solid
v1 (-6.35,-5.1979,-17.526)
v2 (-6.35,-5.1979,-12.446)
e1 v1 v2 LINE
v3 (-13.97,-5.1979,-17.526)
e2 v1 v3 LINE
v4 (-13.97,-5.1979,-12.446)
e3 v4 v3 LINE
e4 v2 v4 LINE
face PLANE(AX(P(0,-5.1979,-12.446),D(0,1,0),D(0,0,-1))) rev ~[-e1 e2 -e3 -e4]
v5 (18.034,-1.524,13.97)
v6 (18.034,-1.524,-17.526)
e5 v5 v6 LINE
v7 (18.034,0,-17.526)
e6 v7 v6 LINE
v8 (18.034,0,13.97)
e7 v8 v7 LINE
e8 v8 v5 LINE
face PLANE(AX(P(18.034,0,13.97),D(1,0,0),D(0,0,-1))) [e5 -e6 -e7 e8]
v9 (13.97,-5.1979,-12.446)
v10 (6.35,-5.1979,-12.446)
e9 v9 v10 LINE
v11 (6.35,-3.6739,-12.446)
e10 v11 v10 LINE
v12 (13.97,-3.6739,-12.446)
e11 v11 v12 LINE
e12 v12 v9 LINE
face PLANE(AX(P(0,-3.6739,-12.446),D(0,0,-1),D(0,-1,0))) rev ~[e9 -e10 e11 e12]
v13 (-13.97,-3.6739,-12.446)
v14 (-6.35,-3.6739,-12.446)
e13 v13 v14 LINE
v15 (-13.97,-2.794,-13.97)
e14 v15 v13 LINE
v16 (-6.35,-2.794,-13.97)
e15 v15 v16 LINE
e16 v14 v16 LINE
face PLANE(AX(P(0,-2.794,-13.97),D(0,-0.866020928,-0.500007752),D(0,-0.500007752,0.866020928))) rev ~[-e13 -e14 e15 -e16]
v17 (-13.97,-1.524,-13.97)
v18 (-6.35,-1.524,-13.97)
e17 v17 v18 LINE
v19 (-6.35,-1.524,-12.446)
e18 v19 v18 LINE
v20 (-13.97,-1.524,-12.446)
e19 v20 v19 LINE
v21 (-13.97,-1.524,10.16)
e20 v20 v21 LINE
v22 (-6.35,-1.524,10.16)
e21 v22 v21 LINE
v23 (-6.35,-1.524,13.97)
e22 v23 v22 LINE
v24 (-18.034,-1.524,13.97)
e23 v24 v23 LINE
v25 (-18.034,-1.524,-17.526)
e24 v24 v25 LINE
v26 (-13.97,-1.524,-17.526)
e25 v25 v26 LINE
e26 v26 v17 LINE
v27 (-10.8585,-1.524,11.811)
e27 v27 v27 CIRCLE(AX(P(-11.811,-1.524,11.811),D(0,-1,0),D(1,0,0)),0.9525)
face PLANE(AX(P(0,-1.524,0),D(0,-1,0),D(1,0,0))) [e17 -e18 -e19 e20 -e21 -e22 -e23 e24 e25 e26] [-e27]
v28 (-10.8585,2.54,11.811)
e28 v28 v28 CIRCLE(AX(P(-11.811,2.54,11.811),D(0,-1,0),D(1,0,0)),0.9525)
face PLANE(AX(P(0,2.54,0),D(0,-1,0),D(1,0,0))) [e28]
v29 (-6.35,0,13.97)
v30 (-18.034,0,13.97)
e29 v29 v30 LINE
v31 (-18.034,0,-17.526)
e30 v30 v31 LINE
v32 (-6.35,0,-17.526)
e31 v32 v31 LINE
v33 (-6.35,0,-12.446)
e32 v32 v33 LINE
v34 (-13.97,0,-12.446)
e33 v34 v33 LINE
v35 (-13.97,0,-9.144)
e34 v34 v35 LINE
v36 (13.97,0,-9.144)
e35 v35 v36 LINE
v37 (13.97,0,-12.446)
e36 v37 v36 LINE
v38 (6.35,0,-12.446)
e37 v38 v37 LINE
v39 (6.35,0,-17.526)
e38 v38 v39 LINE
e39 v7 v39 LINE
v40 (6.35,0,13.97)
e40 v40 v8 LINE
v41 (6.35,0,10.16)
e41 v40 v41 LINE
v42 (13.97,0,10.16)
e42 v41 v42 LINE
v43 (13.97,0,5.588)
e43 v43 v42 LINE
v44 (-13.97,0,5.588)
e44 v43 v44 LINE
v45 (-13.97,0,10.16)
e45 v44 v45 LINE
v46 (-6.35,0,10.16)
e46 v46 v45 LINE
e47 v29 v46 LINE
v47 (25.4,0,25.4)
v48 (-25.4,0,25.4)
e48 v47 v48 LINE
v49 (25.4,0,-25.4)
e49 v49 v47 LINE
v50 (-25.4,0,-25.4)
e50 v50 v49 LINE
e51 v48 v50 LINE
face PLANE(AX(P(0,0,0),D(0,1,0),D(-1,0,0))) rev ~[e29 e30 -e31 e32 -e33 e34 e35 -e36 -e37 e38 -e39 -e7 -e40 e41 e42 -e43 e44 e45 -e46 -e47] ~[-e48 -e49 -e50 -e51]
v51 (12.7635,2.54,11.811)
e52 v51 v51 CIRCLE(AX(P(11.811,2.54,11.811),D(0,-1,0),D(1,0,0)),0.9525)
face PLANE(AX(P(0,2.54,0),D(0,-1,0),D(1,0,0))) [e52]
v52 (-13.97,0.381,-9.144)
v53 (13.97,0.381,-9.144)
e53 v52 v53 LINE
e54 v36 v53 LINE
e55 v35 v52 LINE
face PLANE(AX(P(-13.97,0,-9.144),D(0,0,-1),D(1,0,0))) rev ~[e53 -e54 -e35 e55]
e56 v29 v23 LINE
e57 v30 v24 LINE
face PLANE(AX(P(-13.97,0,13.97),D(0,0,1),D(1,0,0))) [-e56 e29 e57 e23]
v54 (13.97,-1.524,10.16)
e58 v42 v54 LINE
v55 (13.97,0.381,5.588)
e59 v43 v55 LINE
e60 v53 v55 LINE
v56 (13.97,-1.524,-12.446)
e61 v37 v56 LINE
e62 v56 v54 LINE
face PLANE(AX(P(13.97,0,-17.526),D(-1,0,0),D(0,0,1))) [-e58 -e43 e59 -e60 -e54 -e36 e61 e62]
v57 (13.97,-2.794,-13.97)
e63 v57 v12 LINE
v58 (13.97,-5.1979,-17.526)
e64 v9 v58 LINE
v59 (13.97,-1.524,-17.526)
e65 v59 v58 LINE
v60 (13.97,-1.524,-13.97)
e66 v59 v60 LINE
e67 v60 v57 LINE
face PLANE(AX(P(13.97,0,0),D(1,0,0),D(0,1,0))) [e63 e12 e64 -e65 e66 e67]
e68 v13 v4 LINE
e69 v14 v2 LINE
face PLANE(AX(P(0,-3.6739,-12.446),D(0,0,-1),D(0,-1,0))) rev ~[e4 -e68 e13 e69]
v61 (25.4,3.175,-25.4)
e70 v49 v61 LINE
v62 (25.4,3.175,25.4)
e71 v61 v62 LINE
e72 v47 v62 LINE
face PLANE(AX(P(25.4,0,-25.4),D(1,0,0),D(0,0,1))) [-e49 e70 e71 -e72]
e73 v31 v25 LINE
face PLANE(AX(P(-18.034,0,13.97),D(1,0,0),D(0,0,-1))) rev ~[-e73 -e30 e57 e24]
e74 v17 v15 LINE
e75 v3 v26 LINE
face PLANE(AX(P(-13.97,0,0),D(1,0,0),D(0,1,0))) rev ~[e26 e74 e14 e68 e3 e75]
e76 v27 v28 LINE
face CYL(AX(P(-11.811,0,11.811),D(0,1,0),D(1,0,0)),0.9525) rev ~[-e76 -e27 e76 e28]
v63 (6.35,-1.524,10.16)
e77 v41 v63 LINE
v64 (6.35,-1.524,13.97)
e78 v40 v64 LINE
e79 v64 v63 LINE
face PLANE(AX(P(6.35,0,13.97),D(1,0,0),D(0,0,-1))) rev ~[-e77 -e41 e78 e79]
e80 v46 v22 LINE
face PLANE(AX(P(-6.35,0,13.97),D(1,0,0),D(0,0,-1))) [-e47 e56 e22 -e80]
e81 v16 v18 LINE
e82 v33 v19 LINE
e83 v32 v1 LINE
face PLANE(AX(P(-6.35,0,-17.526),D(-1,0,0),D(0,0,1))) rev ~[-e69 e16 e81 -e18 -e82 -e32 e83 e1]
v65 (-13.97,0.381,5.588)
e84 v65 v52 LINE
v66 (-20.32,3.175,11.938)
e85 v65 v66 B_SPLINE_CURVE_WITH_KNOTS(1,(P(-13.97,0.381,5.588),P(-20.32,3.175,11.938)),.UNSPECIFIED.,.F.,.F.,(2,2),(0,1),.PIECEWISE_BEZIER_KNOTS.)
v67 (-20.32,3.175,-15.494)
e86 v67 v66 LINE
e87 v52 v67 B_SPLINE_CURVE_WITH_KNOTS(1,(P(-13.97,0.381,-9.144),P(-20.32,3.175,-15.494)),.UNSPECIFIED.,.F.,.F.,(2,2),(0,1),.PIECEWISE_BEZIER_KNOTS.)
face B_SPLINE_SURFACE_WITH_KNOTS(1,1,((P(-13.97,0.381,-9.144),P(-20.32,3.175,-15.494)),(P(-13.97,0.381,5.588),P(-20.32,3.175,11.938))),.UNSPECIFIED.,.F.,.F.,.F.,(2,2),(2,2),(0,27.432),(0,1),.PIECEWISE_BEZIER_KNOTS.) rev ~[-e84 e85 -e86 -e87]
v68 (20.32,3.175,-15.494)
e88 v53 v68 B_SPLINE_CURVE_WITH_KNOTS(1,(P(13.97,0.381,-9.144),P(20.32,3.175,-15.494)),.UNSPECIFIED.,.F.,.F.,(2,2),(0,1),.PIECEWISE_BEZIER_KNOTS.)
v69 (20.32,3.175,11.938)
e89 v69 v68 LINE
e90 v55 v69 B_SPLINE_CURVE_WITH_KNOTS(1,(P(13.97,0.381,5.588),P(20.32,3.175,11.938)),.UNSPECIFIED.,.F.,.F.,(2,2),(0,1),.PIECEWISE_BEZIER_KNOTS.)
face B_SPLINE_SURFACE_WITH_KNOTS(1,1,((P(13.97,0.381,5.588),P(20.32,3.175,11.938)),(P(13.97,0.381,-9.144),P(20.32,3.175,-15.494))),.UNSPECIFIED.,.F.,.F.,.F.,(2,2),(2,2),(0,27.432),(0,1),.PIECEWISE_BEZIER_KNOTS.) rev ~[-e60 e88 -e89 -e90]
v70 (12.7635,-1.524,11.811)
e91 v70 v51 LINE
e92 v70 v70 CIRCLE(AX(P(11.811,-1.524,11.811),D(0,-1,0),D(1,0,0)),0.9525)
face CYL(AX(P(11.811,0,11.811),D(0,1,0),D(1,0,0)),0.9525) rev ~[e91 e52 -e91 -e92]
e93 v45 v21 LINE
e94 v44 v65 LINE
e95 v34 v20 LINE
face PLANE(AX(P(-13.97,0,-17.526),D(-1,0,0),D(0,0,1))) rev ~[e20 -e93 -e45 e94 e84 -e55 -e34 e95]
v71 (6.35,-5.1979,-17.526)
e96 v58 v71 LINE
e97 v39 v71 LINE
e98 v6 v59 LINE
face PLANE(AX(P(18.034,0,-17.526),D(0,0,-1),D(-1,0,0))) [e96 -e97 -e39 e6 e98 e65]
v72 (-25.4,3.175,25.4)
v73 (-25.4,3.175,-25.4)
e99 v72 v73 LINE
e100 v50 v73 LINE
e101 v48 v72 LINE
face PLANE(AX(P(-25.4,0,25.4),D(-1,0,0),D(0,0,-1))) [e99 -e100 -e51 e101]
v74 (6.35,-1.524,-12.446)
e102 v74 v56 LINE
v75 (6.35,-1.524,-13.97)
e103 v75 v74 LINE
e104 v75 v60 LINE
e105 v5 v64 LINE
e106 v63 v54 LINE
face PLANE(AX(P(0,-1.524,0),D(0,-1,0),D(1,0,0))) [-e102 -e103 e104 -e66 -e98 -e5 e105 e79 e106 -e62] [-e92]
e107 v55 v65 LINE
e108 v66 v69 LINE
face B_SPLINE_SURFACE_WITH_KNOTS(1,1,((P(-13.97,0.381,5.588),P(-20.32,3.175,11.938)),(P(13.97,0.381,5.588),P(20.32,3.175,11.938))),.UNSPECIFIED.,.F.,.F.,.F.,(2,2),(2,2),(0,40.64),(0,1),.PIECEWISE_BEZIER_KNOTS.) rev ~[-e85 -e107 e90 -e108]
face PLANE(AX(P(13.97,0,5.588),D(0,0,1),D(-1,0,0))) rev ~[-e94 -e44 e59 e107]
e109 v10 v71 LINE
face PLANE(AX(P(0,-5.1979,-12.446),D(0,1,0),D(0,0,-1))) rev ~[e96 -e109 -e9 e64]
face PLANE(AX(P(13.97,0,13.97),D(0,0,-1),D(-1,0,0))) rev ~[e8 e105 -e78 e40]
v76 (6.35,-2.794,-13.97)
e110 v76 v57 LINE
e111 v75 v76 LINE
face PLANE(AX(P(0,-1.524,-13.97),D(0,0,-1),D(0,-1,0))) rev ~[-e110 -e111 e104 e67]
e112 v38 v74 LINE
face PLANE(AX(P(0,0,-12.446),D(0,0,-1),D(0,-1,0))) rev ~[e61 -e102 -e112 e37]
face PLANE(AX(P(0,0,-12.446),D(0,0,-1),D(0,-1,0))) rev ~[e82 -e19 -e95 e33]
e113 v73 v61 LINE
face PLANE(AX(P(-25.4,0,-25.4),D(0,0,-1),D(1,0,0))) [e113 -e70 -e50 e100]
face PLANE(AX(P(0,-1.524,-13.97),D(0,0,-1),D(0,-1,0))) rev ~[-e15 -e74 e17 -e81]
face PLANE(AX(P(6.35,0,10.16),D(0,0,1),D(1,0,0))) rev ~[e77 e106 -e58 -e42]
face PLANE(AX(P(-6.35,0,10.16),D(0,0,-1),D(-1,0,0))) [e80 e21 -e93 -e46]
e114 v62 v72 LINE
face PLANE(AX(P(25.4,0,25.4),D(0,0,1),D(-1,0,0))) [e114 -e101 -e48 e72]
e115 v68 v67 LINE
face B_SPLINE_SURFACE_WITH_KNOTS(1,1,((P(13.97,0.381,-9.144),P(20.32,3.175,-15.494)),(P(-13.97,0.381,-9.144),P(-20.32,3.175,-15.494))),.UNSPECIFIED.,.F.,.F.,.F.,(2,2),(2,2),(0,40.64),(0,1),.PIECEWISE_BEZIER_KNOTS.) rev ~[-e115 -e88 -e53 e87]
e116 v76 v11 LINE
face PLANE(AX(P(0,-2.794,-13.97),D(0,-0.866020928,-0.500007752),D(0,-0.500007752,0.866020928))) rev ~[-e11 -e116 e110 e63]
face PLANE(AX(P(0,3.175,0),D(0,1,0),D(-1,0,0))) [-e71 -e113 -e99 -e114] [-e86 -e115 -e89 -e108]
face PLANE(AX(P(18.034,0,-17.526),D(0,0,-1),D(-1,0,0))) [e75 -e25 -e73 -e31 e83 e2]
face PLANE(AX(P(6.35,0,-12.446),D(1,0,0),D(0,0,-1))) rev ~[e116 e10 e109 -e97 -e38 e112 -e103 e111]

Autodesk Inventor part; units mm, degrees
ref_plane "YZ Plane" through (0, 0, 0) normal (1, 0, 0) x (0, 1, 0)
ref_plane "XZ Plane" through (0, 0, 0) normal (0, 1, 0) x (-1, 0, 0)
ref_plane "XY Plane" through (0, 0, 0) normal (0, 0, 1) x (1, 0, 0)
sketch "Sketch1" plane through (0, 0, 0) normal (0, 1, 0) x (-1, 0, 0)
  line L0 (-25.4, 25.4) -> (25.4, 25.4)
  line L1 (25.4, 25.4) -> (25.4, -25.4)
  line L2 (25.4, -25.4) -> (-25.4, -25.4)
  line L3 (-25.4, -25.4) -> (-25.4, 25.4)
  line L4 (-25.4, 25.4) -> (25.4, -25.4) construction
  line L5 (25.4, 25.4) -> (-25.4, -25.4) construction
  point P0 (0, 0)
  dimension "d0" = 50.8
  dimension "d1" = 50.8
extrude "Extrusion1" add sketch "Sketch1" along normal blind 3.175
sketch "Sketch2" plane through (0, 0, 0) normal (0, -1, 0) x (1, 0, 0)
  line L0 (-11.811, 11.811) -> (11.811, 11.811) construction
  line L1 (11.811, 11.811) -> (11.811, -11.811) construction
  line L2 (11.811, -11.811) -> (-11.811, -11.811) construction
  line L3 (-11.811, -11.811) -> (-11.811, 11.811) construction
  circle A0 centre (-11.811, 11.811) radius 0.9525
  line L4 (13.97, 13.97) -> (-13.97, 13.97) construction
  line L5 (-13.97, 13.97) -> (-13.97, -13.97) construction
  line L6 (-13.97, -13.97) -> (13.97, -13.97) construction
  line L7 (13.97, -13.97) -> (13.97, 13.97) construction
  line L8 (13.97, 13.97) -> (6.35, 13.97)
  line L9 (6.35, 13.97) -> (6.35, 10.16)
  line L10 (6.35, 10.16) -> (13.97, 10.16)
  line L11 (13.97, 10.16) -> (13.97, 13.97)
  line L12 (-13.97, 13.97) -> (-6.35, 13.97)
  line L13 (-6.35, 13.97) -> (-6.35, 10.16)
  line L14 (-6.35, 10.16) -> (-13.97, 10.16)
  line L15 (-13.97, 10.16) -> (-13.97, 13.97)
  circle A1 centre (11.811, 11.811) radius 0.9525
  line L16 (13.97, 13.97) -> (18.034, 13.97)
  line L17 (18.034, 13.97) -> (18.034, -17.526)
  line L18 (18.034, -17.526) -> (13.97, -17.526)
  line L19 (13.97, -17.526) -> (13.97, 13.97)
  line L20 (-13.97, 13.97) -> (-18.034, 13.97)
  line L21 (-18.034, 13.97) -> (-18.034, -17.526)
  line L22 (-18.034, -17.526) -> (-13.97, -17.526)
  line L23 (-13.97, -17.526) -> (-13.97, 13.97)
  point P0 (0, 0)
  point P1 (11.811, 0)
  point P2 (0, 11.811)
  point P3 (0, -13.97)
  point P4 (-13.97, 0)
  point P5 (-13.97, 10.16)
  point P6 (13.97, 10.16)
  dimension "d4" = 23.622
  dimension "d5" = 23.622
  dimension "d27" = 27.94
  dimension "d28" = 27.94
  dimension "d29" = 7.62
  dimension "d30" = 3.81
  dimension "d31" = 1.905
  dimension "d32" = 4.064
  dimension "d33" = 4.064
  dimension "d46" = 31.496
extrude "Extrusion2" add sketch "Sketch2" along normal blind 1.524
sketch "Sketch3" plane through (0, 0, 0) normal (0, -1, 0) x (1, 0, 0)
  line L0 (13.97, 13.97) -> (-13.97, 13.97) construction
  line L1 (-13.97, 13.97) -> (-13.97, -13.97) construction
  line L2 (-13.97, -13.97) -> (13.97, -13.97) construction
  line L3 (13.97, -13.97) -> (13.97, 13.97) construction
  line L4 (13.97, 13.97) -> (-13.97, -13.97) construction
  line L5 (-13.97, 13.97) -> (13.97, -13.97) construction
  line L6 (13.97, 5.588) -> (-13.97, 5.588)
  line L7 (-13.97, 5.588) -> (-13.97, -9.144)
  line L8 (-13.97, -9.144) -> (13.97, -9.144)
  line L9 (13.97, -9.144) -> (13.97, 5.588)
  point P0 (0, 0)
  dimension "d18" = 27.94
  dimension "d19" = 27.94
  dimension "d20" = 4.826
  dimension "d21" = 14.732
sketch "Sketch4" plane through (0, 3.175, 0) normal (0, 1, 0) x (1, 0, 0)
  line L0 (-13.97, 9.144) -> (13.97, 9.144) projected
  line L1 (13.97, -5.588) -> (-13.97, -5.588) projected
  line L2 (-13.97, -5.588) -> (-13.97, 9.144) projected
  line L3 (13.97, 9.144) -> (13.97, -5.588) projected
  line L4 (-20.32, -11.938) -> (20.32, -11.938)
  line L5 (20.32, -11.938) -> (20.32, 15.494)
  line L6 (20.32, 15.494) -> (-20.32, 15.494)
  line L7 (-20.32, 15.494) -> (-20.32, -11.938)
  point P0 (0, 0)
  dimension "d22" = 6.35
sketch "Sketch5" plane through (0, 0, 0) normal (1, 0, 0) x (0, 1, 0)
  line L0 (0, 25.4) -> (0, -25.4) projected
  line L1 (0, -12.446) -> (-1.524, -12.446)
  line L2 (-1.524, 10.16) -> (-1.524, -17.526) projected
  line L3 (-1.524, -12.446) -> (-1.524, -13.97)
  line L4 (-1.524, -13.97) -> (-2.794, -13.97)
  line L5 (-2.794, -13.97) -> (-3.6739, -12.446)
  line L6 (-3.6739, -12.446) -> (-5.1979, -12.446)
  line L7 (-5.1979, -12.446) -> (-5.1979, -17.526)
  line L8 (-5.1979, -17.526) -> (0, -17.526)
  line L9 (0, -17.526) -> (0, -12.446)
  line L10 (3.175, -16.002) -> (3.175, 11.43) projected
  line L11 (0, 13.97) -> (-1.524, 13.97) projected
  point P0 (0, 0)
  point P1 (0, -17.526)
  dimension "d34" = 1.524
  dimension "d35" = 1.524
  dimension "d36" = 1.27
  dimension "d37" = 120
  dimension "d38" = 1.524
  dimension "d39" = 5.08
  dimension "d40" = 27.94
extrude "Extrusion3" add sketch "Sketch5" along normal mid plane 27.94
sketch "Sketch6" plane through (0, 0, 0) normal (0, -1, 0) x (1, 0, 0)
  line L0 (-13.97, -17.526) -> (13.97, -17.526) projected
  line L1 (13.97, -12.446) -> (13.97, -17.526) projected
  line L2 (-13.97, -12.446) -> (13.97, -12.446) projected
  line L3 (-13.97, -17.526) -> (-13.97, -12.446) projected
  line L4 (-6.35, -12.446) -> (6.35, -12.446)
  line L5 (6.35, -12.446) -> (6.35, -17.526)
  line L6 (6.35, -17.526) -> (-6.35, -17.526)
  line L7 (-6.35, -17.526) -> (-6.35, -12.446)
  point P0 (0, 0)
  point P1 (0, -12.446)
  point P2 (0, -12.446)
  dimension "d43" = 12.7
extrude "Extrusion4" cut sketch "Sketch6" along normal up to surface (5.1979 mm away) contours L7 L2 L5 L0
sketch "Sketch7" plane through (0, 0, 0) normal (0, -1, 0) x (1, 0, 0)
  circle A0 centre (11.811, 11.811) radius 0.9525 projected
  circle A1 centre (-11.811, 11.811) radius 0.9525 projected
  point P0 (0, 0)
extrude "Extrusion5" cut sketch "Sketch7" against normal blind 2.54
extrude "Extrusion7" cut sketch "Sketch3" against normal blind 0.381
loft "Loft2" cut profiles "Sketch4" section 1 edges at (-13.97, 0.381, -1.778) (0, 0.381, -9.144) (13.97, 0.381, -1.778) (0, 0.381, 5.588) contours L0 L3 L1 L2 | L7 L6 L5 L4
properties part number "DisplayInsert"
